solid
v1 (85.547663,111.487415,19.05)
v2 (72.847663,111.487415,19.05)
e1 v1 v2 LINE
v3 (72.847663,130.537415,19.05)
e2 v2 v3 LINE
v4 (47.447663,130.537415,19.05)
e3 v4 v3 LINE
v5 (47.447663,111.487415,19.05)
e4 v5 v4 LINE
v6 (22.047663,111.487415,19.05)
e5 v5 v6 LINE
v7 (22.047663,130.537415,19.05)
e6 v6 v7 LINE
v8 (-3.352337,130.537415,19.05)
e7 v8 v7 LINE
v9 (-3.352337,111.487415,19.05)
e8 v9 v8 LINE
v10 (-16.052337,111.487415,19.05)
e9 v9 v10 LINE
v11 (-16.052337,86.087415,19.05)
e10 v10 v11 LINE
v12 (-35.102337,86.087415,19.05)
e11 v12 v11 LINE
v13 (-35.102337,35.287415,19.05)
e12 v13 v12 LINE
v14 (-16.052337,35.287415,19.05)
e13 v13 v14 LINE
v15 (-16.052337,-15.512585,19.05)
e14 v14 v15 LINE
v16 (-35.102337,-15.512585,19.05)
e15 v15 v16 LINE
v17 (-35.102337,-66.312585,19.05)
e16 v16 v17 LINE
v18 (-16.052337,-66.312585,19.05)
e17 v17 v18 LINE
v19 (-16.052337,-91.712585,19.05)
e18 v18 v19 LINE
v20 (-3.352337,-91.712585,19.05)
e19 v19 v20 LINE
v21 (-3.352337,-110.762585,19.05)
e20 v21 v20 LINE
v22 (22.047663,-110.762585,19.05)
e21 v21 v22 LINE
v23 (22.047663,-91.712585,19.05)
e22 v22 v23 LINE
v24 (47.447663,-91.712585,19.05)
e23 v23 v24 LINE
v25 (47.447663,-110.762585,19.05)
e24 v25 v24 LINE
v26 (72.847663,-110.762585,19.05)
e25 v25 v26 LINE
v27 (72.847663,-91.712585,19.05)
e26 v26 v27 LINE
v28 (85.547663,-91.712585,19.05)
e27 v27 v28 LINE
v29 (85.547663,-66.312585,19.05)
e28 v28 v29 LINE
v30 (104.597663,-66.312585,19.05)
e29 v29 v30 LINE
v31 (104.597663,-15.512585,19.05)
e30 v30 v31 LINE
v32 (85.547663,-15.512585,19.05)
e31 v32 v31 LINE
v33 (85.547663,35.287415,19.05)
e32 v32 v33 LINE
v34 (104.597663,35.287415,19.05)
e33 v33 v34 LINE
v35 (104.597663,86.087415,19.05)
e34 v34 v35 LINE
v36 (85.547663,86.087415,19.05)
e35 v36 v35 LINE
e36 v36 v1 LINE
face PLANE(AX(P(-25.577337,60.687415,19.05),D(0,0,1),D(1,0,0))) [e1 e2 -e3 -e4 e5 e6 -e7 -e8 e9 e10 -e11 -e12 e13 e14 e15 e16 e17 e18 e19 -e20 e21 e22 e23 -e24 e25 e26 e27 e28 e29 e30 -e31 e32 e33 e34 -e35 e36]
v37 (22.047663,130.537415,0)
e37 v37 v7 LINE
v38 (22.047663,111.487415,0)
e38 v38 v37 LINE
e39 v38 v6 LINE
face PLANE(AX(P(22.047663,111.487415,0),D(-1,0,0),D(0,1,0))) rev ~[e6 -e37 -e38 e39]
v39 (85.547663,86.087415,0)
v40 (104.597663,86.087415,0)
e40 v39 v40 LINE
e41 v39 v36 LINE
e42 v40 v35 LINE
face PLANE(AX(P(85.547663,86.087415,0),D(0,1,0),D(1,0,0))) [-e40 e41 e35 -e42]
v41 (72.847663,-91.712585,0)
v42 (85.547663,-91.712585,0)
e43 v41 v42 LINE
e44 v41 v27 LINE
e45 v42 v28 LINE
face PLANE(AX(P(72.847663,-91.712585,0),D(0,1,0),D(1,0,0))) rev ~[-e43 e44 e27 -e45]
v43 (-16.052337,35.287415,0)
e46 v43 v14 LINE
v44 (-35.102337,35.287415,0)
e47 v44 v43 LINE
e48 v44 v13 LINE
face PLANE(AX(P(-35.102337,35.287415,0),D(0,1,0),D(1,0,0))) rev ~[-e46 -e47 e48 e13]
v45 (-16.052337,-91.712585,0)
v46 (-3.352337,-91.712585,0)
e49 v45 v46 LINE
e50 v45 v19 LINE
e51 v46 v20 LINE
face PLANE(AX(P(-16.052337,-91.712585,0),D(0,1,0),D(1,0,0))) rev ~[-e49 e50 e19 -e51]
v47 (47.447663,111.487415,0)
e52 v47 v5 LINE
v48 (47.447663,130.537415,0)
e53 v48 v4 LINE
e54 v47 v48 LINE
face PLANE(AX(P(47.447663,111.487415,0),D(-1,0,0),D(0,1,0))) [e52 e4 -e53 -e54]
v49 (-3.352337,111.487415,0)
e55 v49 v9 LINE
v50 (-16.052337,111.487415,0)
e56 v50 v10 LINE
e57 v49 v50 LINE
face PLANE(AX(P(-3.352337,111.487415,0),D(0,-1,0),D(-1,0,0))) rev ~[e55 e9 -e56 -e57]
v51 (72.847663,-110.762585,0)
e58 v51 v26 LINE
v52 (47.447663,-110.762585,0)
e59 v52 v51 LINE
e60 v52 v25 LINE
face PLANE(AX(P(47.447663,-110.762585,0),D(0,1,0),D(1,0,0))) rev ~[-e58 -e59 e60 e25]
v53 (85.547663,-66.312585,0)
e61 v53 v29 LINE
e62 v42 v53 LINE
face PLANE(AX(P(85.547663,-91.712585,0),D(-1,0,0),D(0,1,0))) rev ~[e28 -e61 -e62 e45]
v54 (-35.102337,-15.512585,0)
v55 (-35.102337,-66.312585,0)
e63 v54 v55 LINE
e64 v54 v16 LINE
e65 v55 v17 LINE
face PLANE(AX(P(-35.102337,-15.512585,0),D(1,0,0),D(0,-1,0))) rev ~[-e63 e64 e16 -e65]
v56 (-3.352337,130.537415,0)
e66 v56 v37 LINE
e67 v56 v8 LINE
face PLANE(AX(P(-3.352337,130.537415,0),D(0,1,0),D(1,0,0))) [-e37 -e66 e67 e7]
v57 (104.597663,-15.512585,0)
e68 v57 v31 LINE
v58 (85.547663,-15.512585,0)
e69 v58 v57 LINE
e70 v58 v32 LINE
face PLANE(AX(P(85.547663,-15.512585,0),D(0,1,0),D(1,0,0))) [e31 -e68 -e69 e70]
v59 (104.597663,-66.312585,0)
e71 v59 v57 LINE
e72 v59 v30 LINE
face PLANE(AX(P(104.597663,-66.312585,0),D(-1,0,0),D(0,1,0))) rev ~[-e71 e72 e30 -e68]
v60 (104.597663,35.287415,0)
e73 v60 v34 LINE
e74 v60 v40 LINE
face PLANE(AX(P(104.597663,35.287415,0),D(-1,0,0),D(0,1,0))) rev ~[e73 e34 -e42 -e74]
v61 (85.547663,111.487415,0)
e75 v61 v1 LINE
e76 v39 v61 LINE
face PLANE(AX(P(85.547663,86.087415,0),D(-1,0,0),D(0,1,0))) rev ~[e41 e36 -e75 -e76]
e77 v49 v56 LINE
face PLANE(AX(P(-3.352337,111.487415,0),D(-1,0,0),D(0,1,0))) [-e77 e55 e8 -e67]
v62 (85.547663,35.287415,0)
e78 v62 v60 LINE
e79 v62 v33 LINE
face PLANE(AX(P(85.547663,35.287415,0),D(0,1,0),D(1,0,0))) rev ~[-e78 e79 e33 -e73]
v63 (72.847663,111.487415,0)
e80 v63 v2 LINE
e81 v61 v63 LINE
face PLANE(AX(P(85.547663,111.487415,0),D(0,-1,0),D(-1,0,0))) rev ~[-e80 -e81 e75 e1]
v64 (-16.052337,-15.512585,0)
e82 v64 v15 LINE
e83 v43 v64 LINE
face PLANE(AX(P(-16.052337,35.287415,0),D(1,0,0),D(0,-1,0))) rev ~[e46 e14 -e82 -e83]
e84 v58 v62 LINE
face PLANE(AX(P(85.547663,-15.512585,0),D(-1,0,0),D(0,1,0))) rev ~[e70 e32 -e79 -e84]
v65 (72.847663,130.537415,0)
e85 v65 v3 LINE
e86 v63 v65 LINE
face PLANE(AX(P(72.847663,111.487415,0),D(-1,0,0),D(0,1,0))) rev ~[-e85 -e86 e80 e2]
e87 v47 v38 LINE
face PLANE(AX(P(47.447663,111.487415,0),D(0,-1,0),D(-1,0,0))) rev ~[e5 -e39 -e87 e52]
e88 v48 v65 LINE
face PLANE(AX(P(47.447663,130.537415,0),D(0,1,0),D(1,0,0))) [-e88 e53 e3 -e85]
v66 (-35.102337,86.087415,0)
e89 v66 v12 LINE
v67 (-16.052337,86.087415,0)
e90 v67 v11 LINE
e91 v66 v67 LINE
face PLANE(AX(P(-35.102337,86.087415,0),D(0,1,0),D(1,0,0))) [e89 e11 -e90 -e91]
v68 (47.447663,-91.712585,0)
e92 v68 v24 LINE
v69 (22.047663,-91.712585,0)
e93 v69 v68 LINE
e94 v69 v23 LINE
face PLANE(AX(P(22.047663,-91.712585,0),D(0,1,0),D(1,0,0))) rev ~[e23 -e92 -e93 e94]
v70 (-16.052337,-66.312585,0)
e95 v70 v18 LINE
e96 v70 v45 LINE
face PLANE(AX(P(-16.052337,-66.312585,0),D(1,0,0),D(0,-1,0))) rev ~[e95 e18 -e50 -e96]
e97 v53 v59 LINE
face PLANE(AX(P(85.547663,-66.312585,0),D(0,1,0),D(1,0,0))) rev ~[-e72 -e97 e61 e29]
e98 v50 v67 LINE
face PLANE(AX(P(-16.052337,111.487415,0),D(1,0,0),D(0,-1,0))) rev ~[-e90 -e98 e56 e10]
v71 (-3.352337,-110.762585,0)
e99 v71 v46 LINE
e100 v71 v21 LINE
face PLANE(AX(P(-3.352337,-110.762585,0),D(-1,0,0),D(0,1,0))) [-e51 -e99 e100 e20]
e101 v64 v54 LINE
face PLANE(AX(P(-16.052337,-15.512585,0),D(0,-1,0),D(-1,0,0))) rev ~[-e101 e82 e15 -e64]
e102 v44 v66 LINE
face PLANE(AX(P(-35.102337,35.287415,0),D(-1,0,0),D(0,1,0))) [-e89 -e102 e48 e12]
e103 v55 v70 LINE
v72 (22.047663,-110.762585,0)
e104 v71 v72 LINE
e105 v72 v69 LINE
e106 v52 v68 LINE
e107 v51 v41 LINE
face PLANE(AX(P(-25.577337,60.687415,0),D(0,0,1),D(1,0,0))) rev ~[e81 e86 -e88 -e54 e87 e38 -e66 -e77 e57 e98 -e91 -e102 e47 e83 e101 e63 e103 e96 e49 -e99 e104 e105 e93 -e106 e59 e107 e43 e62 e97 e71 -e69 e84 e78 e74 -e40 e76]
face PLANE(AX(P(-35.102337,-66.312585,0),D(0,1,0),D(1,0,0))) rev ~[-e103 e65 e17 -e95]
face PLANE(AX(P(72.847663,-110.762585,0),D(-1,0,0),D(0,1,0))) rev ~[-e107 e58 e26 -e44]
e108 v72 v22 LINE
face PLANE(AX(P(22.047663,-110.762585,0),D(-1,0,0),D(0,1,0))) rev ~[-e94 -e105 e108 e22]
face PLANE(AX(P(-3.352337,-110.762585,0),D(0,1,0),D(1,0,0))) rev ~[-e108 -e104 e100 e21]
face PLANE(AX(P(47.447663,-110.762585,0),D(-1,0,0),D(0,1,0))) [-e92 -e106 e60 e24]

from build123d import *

# Parameters (mm, degrees)
F0_W     = 19.05
F0_H     = 50.8
F0_W_2   = 25.4
F0_H_2   = 19.05
F1_DEPTH = 19.05


# Not quite as in the source:
# - a feature names something its author has since deleted; it is built from what else it names


with BuildPart() as f1:
    # F0 (on Top) → F1 (new body)
    with BuildSketch(Plane.XY):
        with Locations((-25.5773371266, 60.6874149844)):
            Rectangle(F0_W, F0_H)
        Polygon((-3.3523371266, 111.4874149844), (-16.0523371266, 111.4874149844), (-16.0523371266, 86.0874149844), (-16.0523371266, 35.2874149844), (-16.0523371266, -15.5125850156), (-16.0523371266, -32.8271351755), (-16.0523371266, -66.3125850156), (-16.0523371266, -91.7125850156), (-3.3523371266, -91.7125850156), (22.0476628734, -91.7125850156), (47.4476628734, -91.7125850156), (72.8476628734, -91.7125850156), (85.5476628734, -91.7125850156), (85.5476628734, -66.3125850156), (85.5476628734, -15.5125850156), (85.5476628734, 35.2874149844), (85.5476628734, 86.0874149844), (85.5476628734, 111.4874149844), (72.8476628734, 111.4874149844), (47.4476628734, 111.4874149844), (22.0476628734, 111.4874149844), align=None)
        Polygon((-16.0523371266, -32.8271351755), (-16.0523371266, -15.5125850156), (-35.1023371266, -15.5125850156), (-35.1023371266, -66.3125850156), (-16.0523371266, -66.3125850156), align=None)
        with Locations((9.3476628734, -101.2375850156)):
            Rectangle(F0_W_2, F0_H_2)
        with Locations((60.1476628734, -101.2375850156)):
            Rectangle(F0_W_2, F0_H_2)
        with Locations((95.0726628734, -40.9125850156)):
            Rectangle(F0_W, F0_H)
        with Locations((95.0726628734, 60.6874149844)):
            Rectangle(F0_W, F0_H)
        with Locations((60.1476628734, 121.0124149844)):
            Rectangle(F0_W_2, F0_H_2)
        with Locations((9.3476628734, 121.0124149844)):
            Rectangle(F0_W_2, F0_H_2)
    extrude(amount=F1_DEPTH)


solid = f1.part
